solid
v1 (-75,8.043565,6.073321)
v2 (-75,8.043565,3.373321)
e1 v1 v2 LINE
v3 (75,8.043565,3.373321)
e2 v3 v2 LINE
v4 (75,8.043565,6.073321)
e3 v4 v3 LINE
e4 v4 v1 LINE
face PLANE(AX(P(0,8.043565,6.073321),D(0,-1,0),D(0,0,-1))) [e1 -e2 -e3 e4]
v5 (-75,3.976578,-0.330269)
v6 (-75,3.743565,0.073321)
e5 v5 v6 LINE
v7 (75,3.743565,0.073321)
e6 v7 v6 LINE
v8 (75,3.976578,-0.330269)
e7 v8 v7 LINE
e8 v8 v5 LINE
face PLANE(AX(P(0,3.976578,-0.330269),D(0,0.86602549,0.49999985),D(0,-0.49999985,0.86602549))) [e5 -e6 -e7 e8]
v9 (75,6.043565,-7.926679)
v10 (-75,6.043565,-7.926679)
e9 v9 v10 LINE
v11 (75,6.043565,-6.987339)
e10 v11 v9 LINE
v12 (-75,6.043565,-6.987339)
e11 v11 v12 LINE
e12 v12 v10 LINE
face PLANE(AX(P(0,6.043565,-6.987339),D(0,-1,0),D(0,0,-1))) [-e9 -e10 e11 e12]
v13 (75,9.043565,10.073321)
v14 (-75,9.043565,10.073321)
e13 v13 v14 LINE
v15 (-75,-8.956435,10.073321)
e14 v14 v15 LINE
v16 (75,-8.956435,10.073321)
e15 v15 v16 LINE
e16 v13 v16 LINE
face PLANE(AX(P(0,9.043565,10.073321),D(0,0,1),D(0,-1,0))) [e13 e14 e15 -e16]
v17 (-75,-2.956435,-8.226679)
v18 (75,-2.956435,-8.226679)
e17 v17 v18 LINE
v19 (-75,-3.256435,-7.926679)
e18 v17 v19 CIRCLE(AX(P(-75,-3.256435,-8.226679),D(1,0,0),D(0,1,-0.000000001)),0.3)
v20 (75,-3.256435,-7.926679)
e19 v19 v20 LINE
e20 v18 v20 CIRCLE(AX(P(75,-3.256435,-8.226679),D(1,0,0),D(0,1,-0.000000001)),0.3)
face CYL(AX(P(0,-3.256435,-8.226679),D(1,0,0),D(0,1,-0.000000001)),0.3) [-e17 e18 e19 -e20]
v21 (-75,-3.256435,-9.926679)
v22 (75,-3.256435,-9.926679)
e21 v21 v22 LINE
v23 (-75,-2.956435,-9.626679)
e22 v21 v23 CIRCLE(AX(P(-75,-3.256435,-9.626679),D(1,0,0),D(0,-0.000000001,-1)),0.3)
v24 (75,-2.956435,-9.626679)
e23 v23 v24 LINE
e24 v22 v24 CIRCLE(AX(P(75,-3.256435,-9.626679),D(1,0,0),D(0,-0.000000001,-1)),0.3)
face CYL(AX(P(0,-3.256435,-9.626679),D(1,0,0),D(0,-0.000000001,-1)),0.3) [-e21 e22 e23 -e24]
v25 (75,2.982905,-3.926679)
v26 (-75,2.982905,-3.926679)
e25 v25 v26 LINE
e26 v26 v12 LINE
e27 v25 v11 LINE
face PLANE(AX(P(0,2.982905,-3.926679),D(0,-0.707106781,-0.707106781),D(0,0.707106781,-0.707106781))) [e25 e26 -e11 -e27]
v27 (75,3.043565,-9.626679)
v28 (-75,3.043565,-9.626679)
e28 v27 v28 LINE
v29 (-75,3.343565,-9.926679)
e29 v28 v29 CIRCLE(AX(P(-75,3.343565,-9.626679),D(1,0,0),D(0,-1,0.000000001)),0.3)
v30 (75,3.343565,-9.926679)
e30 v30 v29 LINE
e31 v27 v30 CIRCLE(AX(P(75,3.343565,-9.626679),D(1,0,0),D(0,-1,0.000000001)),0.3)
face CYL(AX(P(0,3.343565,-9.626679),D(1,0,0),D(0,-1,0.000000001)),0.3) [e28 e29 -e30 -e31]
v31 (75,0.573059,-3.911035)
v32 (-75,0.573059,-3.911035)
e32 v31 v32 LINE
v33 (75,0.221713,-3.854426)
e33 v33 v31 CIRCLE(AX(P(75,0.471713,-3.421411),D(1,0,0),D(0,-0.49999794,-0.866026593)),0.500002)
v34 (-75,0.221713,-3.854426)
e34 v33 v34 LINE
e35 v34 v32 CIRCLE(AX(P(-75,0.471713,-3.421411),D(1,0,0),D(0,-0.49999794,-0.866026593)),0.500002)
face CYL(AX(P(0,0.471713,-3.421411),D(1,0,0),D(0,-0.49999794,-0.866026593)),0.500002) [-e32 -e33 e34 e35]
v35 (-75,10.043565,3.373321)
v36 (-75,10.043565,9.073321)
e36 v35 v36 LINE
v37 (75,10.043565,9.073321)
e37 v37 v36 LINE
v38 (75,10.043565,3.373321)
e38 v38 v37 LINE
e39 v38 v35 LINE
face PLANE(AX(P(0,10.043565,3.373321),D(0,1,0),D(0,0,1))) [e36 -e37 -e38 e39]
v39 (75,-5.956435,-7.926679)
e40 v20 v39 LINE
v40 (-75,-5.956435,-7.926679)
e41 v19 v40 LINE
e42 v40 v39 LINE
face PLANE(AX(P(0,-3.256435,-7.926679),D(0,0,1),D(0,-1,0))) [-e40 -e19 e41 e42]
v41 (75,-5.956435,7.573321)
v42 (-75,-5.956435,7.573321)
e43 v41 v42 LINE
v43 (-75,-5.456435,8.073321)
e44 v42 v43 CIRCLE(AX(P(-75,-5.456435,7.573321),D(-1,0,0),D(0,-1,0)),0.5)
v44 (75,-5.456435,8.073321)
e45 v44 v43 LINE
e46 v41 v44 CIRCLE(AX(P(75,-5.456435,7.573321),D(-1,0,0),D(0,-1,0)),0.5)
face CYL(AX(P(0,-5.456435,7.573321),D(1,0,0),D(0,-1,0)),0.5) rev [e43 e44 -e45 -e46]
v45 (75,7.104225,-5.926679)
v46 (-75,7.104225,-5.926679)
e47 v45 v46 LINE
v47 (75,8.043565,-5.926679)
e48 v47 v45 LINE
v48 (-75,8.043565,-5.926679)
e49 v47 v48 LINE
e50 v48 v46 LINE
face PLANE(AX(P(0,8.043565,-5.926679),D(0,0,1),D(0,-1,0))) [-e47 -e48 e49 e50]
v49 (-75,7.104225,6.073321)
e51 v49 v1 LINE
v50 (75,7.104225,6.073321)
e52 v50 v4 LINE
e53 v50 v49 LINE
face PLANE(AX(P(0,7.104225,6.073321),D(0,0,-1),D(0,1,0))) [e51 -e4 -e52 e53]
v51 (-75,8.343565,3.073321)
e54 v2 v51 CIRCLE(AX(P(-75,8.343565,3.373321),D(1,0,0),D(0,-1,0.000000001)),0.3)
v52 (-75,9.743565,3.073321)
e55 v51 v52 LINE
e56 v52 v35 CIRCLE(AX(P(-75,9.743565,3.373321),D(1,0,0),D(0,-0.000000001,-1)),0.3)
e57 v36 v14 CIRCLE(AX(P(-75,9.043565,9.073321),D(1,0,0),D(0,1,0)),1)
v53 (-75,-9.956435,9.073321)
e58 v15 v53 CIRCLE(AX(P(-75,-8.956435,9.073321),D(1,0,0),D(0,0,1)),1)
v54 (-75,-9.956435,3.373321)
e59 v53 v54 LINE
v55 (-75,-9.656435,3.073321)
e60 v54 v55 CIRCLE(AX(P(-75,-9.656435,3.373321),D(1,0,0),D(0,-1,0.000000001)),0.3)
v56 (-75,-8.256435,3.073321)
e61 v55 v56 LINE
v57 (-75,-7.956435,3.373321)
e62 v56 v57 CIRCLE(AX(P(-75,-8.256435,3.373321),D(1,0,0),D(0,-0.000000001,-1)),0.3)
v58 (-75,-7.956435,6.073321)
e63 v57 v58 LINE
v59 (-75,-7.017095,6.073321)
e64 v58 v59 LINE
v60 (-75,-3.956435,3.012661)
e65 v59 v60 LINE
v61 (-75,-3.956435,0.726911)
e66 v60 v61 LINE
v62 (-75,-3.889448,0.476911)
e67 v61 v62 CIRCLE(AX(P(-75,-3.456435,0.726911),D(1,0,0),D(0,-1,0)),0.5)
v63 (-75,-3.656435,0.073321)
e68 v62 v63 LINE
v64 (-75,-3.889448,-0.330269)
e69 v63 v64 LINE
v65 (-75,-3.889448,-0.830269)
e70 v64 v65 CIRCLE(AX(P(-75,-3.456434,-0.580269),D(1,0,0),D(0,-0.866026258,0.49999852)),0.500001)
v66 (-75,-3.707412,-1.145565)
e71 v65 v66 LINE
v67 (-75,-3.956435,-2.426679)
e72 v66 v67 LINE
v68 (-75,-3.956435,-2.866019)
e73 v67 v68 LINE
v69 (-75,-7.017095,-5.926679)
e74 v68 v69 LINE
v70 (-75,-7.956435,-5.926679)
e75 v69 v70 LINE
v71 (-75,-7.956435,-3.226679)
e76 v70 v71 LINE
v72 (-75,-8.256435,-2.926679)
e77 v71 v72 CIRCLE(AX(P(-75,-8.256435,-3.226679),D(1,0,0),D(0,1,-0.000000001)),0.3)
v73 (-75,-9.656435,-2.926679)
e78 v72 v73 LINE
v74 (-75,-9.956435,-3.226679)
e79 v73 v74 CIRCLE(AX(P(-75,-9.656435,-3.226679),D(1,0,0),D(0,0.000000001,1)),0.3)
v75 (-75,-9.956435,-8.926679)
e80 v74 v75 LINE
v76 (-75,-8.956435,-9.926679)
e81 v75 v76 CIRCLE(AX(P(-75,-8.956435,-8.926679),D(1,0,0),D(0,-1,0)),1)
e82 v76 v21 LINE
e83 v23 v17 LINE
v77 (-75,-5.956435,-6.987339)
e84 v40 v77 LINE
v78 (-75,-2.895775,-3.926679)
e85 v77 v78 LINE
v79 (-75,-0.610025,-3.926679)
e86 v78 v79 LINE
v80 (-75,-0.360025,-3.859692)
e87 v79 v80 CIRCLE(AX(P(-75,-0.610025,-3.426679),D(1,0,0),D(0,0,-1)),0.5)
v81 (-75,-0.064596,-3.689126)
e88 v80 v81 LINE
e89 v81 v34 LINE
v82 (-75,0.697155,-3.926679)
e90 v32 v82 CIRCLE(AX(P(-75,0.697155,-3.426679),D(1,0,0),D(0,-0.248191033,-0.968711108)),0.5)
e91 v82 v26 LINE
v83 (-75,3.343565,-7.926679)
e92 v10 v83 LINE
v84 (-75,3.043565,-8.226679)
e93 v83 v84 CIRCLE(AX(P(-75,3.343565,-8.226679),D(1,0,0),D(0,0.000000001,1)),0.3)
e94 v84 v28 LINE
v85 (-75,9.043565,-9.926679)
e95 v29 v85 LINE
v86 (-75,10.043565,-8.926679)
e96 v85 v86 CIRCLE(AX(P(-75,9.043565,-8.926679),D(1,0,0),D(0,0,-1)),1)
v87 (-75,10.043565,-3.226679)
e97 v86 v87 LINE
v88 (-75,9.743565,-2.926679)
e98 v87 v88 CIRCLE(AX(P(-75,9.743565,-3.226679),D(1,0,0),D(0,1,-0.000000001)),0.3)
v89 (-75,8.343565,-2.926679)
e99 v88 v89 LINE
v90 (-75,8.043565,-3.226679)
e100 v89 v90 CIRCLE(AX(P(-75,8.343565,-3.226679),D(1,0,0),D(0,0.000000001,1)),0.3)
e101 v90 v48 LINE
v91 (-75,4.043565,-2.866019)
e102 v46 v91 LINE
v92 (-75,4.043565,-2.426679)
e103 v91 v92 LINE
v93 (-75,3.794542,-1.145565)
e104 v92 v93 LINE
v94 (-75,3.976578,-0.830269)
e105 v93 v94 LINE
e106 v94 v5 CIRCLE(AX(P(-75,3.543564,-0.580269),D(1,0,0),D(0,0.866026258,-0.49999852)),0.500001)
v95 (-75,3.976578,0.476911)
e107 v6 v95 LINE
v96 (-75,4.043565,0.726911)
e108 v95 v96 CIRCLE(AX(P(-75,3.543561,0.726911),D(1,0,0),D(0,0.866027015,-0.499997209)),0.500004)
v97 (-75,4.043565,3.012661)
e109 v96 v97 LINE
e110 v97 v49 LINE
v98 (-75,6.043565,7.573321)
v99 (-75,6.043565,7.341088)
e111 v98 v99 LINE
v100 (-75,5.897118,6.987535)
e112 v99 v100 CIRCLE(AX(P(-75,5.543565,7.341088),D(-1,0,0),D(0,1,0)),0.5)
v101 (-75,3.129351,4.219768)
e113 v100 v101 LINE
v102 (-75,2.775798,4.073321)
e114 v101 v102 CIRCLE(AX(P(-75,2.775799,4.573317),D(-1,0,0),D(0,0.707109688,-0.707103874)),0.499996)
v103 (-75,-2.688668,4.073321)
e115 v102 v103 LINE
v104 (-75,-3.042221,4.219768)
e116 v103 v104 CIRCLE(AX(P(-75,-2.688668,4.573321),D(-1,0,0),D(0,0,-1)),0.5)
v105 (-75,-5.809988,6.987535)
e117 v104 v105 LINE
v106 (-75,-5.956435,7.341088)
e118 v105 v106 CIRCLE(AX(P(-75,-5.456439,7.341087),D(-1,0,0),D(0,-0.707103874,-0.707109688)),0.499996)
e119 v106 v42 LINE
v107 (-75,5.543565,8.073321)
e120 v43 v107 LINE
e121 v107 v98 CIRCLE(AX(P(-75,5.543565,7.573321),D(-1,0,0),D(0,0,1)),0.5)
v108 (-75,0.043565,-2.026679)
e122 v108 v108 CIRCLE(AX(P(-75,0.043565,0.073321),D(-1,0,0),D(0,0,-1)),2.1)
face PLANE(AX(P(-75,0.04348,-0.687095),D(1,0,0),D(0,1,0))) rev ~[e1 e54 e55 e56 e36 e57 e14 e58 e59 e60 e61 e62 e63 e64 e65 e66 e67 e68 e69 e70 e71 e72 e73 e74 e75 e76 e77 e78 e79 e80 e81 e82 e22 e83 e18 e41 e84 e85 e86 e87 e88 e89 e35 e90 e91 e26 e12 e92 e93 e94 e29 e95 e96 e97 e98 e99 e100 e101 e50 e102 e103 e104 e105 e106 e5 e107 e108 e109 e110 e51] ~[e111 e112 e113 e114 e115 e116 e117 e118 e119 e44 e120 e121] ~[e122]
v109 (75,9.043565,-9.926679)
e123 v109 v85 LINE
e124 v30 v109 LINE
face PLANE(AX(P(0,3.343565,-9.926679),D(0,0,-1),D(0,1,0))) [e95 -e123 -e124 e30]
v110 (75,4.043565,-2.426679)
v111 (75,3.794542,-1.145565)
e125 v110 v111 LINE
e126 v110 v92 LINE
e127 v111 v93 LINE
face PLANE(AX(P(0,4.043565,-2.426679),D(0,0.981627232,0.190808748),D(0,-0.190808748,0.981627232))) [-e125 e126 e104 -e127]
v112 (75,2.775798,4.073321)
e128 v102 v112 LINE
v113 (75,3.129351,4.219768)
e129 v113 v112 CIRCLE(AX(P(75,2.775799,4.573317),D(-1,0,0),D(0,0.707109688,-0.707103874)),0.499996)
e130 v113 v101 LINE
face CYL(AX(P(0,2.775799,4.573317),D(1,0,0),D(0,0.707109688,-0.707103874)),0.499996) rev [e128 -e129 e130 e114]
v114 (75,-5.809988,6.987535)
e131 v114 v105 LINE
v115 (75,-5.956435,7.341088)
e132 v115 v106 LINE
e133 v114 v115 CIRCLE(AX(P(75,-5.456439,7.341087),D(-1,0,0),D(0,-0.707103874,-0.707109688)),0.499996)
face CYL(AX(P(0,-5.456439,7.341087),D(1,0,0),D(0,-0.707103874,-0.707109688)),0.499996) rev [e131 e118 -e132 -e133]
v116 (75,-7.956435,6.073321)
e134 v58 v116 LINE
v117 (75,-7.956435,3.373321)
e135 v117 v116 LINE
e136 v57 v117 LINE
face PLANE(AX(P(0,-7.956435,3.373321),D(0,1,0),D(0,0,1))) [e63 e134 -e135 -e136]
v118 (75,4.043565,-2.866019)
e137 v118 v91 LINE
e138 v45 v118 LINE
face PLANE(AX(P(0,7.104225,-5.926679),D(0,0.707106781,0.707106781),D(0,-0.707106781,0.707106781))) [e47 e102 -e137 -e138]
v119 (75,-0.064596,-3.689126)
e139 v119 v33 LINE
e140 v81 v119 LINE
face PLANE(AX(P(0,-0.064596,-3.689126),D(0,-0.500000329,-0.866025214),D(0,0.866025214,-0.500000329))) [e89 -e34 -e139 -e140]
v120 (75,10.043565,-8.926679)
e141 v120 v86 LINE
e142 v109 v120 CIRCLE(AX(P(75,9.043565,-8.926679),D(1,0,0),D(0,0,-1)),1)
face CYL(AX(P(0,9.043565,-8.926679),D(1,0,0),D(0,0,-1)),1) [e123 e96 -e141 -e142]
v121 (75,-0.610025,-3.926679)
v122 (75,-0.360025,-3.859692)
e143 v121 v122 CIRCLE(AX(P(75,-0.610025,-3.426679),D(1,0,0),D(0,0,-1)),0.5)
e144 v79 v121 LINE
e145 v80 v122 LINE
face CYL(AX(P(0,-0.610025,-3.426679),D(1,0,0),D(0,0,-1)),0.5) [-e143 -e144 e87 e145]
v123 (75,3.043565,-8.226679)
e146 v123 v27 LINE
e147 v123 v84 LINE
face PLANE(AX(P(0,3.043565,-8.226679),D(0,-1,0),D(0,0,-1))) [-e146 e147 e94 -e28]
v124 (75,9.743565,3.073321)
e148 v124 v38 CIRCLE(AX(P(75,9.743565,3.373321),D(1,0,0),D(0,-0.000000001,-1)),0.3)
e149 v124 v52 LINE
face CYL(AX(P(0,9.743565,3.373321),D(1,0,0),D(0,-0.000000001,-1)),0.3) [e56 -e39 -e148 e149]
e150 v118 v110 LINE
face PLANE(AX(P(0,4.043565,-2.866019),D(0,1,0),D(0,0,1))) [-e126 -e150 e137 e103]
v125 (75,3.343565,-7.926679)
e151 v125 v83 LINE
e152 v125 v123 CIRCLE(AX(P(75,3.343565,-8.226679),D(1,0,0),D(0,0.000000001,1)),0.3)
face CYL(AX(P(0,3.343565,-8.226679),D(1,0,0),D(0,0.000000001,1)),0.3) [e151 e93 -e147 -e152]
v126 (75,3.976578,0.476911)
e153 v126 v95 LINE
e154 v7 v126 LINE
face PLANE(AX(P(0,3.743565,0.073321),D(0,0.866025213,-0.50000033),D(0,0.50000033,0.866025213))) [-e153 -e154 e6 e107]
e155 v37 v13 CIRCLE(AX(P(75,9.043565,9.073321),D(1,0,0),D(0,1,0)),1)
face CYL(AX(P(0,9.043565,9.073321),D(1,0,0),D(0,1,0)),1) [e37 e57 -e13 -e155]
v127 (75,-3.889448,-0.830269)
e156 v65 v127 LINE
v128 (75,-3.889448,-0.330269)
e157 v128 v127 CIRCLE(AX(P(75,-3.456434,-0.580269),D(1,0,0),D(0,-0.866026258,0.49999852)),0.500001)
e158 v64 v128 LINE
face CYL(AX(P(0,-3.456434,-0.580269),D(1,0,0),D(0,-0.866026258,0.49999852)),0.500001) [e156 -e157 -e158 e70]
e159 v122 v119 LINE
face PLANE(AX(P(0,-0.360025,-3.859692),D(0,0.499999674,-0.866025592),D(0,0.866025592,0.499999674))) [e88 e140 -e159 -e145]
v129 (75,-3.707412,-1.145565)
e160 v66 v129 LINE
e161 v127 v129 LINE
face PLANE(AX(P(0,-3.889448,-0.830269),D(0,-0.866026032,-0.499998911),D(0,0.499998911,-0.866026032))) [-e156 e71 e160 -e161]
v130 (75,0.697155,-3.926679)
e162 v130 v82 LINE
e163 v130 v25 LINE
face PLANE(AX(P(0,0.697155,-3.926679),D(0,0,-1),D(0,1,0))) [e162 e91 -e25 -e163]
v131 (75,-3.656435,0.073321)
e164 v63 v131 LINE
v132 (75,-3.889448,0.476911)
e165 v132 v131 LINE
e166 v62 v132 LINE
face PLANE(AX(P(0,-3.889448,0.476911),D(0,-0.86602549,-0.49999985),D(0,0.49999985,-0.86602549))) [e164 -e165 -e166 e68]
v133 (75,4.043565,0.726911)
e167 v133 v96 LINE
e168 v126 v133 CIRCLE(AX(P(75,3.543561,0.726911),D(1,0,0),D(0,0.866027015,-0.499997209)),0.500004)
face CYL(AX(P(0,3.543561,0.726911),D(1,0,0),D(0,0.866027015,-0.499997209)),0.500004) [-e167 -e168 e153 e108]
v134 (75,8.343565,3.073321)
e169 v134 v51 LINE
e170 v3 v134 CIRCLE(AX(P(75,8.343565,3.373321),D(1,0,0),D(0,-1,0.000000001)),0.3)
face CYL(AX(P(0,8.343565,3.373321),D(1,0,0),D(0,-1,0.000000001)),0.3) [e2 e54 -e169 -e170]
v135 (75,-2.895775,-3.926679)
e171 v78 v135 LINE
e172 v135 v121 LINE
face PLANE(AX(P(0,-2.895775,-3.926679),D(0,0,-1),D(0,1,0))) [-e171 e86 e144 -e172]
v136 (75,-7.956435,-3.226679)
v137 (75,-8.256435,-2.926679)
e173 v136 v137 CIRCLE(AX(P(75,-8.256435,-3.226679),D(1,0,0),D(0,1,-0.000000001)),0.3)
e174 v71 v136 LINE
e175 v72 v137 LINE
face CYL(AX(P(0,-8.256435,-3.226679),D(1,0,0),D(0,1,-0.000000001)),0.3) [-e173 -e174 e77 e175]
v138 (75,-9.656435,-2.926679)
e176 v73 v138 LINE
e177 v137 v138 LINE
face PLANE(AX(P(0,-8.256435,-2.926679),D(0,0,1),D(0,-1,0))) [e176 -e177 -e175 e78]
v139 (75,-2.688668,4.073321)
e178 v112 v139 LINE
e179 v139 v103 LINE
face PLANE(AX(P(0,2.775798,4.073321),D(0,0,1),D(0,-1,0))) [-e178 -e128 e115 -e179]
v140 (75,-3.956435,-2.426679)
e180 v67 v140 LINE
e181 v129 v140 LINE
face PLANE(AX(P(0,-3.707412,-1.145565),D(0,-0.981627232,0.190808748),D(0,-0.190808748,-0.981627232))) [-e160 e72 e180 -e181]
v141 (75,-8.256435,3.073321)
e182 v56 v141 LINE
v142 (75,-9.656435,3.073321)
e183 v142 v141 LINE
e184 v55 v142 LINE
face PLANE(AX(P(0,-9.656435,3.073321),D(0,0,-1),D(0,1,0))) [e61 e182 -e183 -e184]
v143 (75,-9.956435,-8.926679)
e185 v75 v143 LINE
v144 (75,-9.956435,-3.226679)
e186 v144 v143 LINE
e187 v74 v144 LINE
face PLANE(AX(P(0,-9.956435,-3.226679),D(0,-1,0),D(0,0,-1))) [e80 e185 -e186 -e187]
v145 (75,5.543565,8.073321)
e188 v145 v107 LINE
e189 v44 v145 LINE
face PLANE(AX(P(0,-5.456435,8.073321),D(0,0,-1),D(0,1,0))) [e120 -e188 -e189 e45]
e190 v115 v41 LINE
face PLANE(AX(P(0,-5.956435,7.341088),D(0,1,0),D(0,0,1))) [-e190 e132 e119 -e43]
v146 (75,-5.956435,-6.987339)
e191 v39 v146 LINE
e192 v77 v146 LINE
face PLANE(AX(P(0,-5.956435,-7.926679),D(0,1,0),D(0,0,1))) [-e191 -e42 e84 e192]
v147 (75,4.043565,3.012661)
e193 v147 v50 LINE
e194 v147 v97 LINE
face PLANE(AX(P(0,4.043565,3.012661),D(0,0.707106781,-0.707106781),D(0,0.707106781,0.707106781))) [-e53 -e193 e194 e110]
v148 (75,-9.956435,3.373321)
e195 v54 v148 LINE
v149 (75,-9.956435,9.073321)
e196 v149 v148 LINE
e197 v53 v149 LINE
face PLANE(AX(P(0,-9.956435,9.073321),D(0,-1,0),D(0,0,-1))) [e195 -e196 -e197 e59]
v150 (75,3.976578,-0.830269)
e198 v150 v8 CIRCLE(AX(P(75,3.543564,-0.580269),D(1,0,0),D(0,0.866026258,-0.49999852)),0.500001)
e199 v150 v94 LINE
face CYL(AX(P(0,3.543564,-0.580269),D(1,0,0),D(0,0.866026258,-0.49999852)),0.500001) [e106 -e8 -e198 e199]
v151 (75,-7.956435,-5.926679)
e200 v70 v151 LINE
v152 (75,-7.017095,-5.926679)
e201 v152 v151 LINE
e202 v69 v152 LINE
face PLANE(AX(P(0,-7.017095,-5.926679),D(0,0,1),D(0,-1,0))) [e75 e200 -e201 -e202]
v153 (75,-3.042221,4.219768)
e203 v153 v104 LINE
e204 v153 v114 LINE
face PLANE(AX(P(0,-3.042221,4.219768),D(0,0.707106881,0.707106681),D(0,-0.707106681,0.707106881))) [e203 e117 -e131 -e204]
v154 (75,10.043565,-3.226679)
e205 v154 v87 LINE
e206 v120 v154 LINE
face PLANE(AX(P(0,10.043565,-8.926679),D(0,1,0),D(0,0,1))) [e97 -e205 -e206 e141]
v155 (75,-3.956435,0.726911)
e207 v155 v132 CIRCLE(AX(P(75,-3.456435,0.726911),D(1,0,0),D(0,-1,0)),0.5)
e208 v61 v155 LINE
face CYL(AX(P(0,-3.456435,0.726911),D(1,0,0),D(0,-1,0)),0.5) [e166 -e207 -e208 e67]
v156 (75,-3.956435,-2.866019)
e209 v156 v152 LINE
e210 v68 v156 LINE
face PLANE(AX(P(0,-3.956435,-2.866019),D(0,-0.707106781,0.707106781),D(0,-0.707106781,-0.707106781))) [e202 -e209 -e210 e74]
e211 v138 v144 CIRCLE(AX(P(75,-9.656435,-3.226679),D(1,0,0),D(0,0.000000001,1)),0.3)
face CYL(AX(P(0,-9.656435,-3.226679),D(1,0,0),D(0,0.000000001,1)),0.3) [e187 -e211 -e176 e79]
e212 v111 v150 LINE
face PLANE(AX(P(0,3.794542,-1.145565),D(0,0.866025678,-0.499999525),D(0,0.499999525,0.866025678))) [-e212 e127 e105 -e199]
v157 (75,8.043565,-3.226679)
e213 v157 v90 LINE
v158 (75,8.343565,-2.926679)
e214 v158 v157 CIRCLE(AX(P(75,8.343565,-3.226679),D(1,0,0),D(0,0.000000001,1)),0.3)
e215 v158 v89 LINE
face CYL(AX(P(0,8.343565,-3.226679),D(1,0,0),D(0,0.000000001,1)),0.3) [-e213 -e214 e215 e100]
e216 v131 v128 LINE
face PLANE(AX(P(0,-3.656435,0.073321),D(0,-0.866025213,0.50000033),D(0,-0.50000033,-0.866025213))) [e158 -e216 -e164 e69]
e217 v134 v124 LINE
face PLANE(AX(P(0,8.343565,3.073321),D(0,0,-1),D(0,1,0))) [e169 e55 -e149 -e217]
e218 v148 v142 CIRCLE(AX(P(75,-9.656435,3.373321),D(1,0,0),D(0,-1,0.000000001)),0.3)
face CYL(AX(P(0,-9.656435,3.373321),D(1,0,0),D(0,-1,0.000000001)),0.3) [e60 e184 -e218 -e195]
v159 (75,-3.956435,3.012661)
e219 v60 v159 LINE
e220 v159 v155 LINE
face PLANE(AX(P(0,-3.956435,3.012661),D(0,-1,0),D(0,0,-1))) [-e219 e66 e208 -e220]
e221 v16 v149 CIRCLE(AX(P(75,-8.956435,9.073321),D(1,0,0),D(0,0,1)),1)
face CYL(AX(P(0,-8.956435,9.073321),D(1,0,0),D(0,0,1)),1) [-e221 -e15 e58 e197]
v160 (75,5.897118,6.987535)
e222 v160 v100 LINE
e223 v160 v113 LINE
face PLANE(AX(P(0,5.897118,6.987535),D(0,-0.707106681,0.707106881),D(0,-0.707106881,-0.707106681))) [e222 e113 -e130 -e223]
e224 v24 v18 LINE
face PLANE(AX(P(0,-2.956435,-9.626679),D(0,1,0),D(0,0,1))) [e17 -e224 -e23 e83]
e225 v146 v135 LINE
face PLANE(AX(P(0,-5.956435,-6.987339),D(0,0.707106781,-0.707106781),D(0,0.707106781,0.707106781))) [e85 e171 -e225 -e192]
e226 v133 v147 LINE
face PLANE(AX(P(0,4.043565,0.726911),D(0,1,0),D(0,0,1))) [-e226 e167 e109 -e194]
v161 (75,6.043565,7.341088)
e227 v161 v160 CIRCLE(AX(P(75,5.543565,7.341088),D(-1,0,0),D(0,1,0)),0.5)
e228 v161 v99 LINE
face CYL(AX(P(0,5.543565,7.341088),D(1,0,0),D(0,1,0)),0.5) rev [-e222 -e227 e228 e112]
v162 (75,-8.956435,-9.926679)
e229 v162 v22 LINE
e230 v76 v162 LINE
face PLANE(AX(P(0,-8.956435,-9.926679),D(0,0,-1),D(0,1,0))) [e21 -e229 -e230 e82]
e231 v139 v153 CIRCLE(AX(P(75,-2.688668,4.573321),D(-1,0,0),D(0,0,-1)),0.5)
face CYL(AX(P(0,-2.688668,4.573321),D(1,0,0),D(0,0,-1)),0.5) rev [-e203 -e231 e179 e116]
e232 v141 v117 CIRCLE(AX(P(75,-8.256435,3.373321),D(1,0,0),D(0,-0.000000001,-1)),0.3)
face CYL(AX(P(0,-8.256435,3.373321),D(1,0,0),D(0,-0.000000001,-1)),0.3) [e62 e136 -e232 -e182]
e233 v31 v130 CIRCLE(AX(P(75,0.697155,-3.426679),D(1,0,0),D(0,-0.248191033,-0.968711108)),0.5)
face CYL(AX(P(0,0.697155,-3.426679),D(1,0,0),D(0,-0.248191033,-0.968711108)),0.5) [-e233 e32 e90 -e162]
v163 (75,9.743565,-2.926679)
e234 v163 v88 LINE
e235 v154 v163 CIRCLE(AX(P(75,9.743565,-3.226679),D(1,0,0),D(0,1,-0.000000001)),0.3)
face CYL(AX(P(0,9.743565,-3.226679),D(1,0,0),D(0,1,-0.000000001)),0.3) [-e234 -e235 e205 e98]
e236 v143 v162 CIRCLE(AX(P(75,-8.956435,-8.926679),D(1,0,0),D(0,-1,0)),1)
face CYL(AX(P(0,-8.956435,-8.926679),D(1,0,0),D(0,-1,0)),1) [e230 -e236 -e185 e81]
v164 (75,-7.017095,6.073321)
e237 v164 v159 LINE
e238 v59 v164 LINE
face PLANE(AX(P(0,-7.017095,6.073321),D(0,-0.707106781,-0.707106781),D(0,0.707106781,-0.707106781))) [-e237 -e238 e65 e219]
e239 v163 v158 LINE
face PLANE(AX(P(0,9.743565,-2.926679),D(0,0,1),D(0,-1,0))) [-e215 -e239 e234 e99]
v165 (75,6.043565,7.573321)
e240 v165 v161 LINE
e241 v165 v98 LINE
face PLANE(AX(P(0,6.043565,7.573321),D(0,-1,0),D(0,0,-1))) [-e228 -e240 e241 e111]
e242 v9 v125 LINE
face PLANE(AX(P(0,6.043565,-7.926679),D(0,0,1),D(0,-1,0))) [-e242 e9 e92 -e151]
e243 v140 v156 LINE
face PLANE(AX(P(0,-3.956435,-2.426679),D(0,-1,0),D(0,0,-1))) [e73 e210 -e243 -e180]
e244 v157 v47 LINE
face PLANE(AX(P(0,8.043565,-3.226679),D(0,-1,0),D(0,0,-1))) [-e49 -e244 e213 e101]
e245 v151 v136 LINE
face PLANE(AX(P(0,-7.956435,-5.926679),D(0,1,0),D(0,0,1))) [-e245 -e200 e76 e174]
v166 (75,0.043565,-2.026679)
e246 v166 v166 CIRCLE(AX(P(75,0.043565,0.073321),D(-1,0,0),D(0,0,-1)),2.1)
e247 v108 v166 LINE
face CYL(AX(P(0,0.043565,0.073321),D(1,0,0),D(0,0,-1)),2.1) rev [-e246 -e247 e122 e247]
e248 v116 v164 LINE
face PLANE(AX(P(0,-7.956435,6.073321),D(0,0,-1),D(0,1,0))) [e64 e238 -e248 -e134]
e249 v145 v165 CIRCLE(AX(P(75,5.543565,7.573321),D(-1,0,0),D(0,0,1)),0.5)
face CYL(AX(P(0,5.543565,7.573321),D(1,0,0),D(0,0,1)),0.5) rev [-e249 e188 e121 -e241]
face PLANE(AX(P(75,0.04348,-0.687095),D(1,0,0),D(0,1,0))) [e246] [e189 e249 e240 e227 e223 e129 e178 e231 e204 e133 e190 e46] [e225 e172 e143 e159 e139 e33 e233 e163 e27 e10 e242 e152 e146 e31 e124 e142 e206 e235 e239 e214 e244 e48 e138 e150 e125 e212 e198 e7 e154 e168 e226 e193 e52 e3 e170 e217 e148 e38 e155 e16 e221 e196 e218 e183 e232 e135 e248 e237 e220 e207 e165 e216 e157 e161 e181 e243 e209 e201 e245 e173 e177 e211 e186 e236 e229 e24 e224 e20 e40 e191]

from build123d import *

# Parameters (mm, degrees)
F1_DEPTH = 75


# Not quite as in the source:
# - ends of sketch curves that miss each other by under 0.0002 mm in the source are joined


with BuildPart() as f1:
    # F0 (on Right) → F1 (new body, symmetric)
    with BuildSketch(Plane.YZ):
        with BuildLine():
            Line((9.043565, 10.073321), (0.043565, 10.073321))
            Line((0.043565, 10.073321), (-8.956435, 10.073321))
            ThreePointArc((-8.956435, 10.073321), (-9.6635417812, 9.7804277812), (-9.956435, 9.073321))
            Line((-9.956435, 9.073321), (-9.956435, 3.373321))
            ThreePointArc((-9.956435, 3.373321), (-9.8685670344, 3.1611889656), (-9.656435, 3.073321))
            Line((-9.656435, 3.073321), (-8.256435, 3.073321))
            ThreePointArc((-8.256435, 3.073321), (-8.0443029656, 3.1611889656), (-7.956435, 3.373321))
            Line((-7.956435, 3.373321), (-7.956435, 6.073321))
            Line((-7.956435, 6.073321), (-7.017095, 6.073321))
            Line((-7.017095, 6.073321), (-3.956435, 3.012661))
            Line((-3.956435, 3.012661), (-3.956435, 0.726911))
            ThreePointArc((-3.956435, 0.726911), (-3.9393979324, 0.5975015494), (-3.8894477764, 0.4769111291))
            Line((-3.8894477764, 0.4769111291), (-3.656435, 0.073321))
            Line((-3.656435, 0.073321), (-3.889448, -0.330269))
            ThreePointArc((-3.889448, -0.330269), (-3.956435, -0.580269), (-3.8894477764, -0.8302688709))
            Line((-3.8894477764, -0.8302688709), (-3.707412, -1.145565))
            Line((-3.707412, -1.145565), (-3.956435, -2.426679))
            Line((-3.956435, -2.426679), (-3.956435, -2.866019))
            Line((-3.956435, -2.866019), (-7.017095, -5.926679))
            Line((-7.017095, -5.926679), (-7.956435, -5.926679))
            Line((-7.956435, -5.926679), (-7.956435, -3.226679))
            ThreePointArc((-7.956435, -3.226679), (-8.0443029656, -3.0145469656), (-8.256435, -2.926679))
            Line((-8.256435, -2.926679), (-9.656435, -2.926679))
            ThreePointArc((-9.656435, -2.926679), (-9.8685670344, -3.0145469656), (-9.956435, -3.226679))
            Line((-9.956435, -3.226679), (-9.956435, -8.926679))
            ThreePointArc((-9.956435, -8.926679), (-9.6635417812, -9.6337857812), (-8.956435, -9.926679))
            Line((-8.956435, -9.926679), (-3.256435, -9.926679))
            ThreePointArc((-3.256435, -9.926679), (-3.0443029656, -9.8388110344), (-2.956435, -9.626679))
            Line((-2.956435, -9.626679), (-2.956435, -8.226679))
            ThreePointArc((-2.956435, -8.226679), (-3.0443029656, -8.0145469656), (-3.256435, -7.926679))
            Line((-3.256435, -7.926679), (-5.956435, -7.926679))
            Line((-5.956435, -7.926679), (-5.956435, -6.987339))
            Line((-5.956435, -6.987339), (-2.895775, -3.926679))
            Line((-2.895775, -3.926679), (-0.610025, -3.926679))
            ThreePointArc((-0.610025, -3.926679), (-0.4806155494, -3.9096419324), (-0.3600251291, -3.8596917764))
            Line((-0.3600251291, -3.8596917764), (-0.0645959325, -3.6891257984))
            Line((-0.0645959325, -3.6891257984), (0.2217128734, -3.8544264098))
            ThreePointArc((0.2217128734, -3.8544264098), (0.3921793907, -3.9150473077), (0.5730594828, -3.9110345539))
            ThreePointArc((0.5730594828, -3.9110345539), (0.6346161199, -3.9227524708), (0.697155, -3.926679))
            Line((0.697155, -3.926679), (2.982905, -3.926679))
            Line((2.982905, -3.926679), (6.043565, -6.987339))
            Line((6.043565, -6.987339), (6.043565, -7.926679))
            Line((6.043565, -7.926679), (3.343565, -7.926679))
            ThreePointArc((3.343565, -7.926679), (3.1314329656, -8.0145469656), (3.043565, -8.226679))
            Line((3.043565, -8.226679), (3.043565, -9.626679))
            ThreePointArc((3.043565, -9.626679), (3.1314329656, -9.8388110344), (3.343565, -9.926679))
            Line((3.343565, -9.926679), (9.043565, -9.926679))
            ThreePointArc((9.043565, -9.926679), (9.7506717812, -9.6337857812), (10.043565, -8.926679))
            Line((10.043565, -8.926679), (10.043565, -3.226679))
            ThreePointArc((10.043565, -3.226679), (9.9556970344, -3.0145469656), (9.743565, -2.926679))
            Line((9.743565, -2.926679), (8.343565, -2.926679))
            ThreePointArc((8.343565, -2.926679), (8.1314329656, -3.0145469656), (8.043565, -3.226679))
            Line((8.043565, -3.226679), (8.043565, -5.926679))
            Line((8.043565, -5.926679), (7.104225, -5.926679))
            Line((7.104225, -5.926679), (4.043565, -2.866019))
            Line((4.043565, -2.866019), (4.043565, -2.426679))
            Line((4.043565, -2.426679), (3.794542, -1.145565))
            Line((3.794542, -1.145565), (3.976578, -0.830269))
            ThreePointArc((3.976578, -0.830269), (4.043565, -0.580269), (3.9765777764, -0.3302691291))
            Line((3.9765777764, -0.3302691291), (3.743565, 0.073321))
            Line((3.743565, 0.073321), (3.976578, 0.476911))
            ThreePointArc((3.976578, 0.476911), (4.0265279324, 0.5975015494), (4.043565, 0.726911))
            Line((4.043565, 0.726911), (4.043565, 3.012661))
            Line((4.043565, 3.012661), (7.104225, 6.073321))
            Line((7.104225, 6.073321), (8.043565, 6.073321))
            Line((8.043565, 6.073321), (8.043565, 3.373321))
            ThreePointArc((8.043565, 3.373321), (8.1314329656, 3.1611889656), (8.343565, 3.073321))
            Line((8.343565, 3.073321), (9.743565, 3.073321))
            ThreePointArc((9.743565, 3.073321), (9.9556970344, 3.1611889656), (10.043565, 3.373321))
            Line((10.043565, 3.373321), (10.043565, 9.073321))
            ThreePointArc((10.043565, 9.073321), (9.7506717812, 9.7804277812), (9.043565, 10.073321))
        make_face()
        with BuildLine():
            ThreePointArc((0.043565, 2.173321), (2.143565, 0.073321), (0.043565, -2.026679))
            ThreePointArc((0.043565, -2.026679), (-2.056435, 0.073321), (0.043565, 2.173321))
        make_face(mode=Mode.SUBTRACT)
        with BuildLine():
            Line((2.775798, 4.073321), (0.043565, 4.073321))
            Line((0.043565, 4.073321), (-2.688668, 4.073321))
            ThreePointArc((-2.688668, 4.073321), (-2.8800097162, 4.1113812337), (-3.0422213906, 4.2197676094))
            Line((-3.0422213906, 4.2197676094), (-5.809988, 6.987535))
            ThreePointArc((-5.809988, 6.987535), (-5.9183747663, 7.1497462838), (-5.956435, 7.341088))
            Line((-5.956435, 7.341088), (-5.956435, 7.573321))
            ThreePointArc((-5.956435, 7.573321), (-5.8099883906, 7.9268743906), (-5.456435, 8.073321))
            Line((-5.456435, 8.073321), (0.043565, 8.073321))
            Line((0.043565, 8.073321), (5.543565, 8.073321))
            ThreePointArc((5.543565, 8.073321), (5.8971183906, 7.9268743906), (6.043565, 7.573321))
            Line((6.043565, 7.573321), (6.043565, 7.341088))
            ThreePointArc((6.043565, 7.341088), (6.0055047663, 7.1497462838), (5.8971183906, 6.9875346094))
            Line((5.8971183906, 6.9875346094), (3.129351, 4.219768))
            ThreePointArc((3.129351, 4.219768), (2.9671397162, 4.1113812337), (2.775798, 4.073321))
        make_face(mode=Mode.SUBTRACT)
    extrude(amount=F1_DEPTH, both=True)


solid = f1.part
